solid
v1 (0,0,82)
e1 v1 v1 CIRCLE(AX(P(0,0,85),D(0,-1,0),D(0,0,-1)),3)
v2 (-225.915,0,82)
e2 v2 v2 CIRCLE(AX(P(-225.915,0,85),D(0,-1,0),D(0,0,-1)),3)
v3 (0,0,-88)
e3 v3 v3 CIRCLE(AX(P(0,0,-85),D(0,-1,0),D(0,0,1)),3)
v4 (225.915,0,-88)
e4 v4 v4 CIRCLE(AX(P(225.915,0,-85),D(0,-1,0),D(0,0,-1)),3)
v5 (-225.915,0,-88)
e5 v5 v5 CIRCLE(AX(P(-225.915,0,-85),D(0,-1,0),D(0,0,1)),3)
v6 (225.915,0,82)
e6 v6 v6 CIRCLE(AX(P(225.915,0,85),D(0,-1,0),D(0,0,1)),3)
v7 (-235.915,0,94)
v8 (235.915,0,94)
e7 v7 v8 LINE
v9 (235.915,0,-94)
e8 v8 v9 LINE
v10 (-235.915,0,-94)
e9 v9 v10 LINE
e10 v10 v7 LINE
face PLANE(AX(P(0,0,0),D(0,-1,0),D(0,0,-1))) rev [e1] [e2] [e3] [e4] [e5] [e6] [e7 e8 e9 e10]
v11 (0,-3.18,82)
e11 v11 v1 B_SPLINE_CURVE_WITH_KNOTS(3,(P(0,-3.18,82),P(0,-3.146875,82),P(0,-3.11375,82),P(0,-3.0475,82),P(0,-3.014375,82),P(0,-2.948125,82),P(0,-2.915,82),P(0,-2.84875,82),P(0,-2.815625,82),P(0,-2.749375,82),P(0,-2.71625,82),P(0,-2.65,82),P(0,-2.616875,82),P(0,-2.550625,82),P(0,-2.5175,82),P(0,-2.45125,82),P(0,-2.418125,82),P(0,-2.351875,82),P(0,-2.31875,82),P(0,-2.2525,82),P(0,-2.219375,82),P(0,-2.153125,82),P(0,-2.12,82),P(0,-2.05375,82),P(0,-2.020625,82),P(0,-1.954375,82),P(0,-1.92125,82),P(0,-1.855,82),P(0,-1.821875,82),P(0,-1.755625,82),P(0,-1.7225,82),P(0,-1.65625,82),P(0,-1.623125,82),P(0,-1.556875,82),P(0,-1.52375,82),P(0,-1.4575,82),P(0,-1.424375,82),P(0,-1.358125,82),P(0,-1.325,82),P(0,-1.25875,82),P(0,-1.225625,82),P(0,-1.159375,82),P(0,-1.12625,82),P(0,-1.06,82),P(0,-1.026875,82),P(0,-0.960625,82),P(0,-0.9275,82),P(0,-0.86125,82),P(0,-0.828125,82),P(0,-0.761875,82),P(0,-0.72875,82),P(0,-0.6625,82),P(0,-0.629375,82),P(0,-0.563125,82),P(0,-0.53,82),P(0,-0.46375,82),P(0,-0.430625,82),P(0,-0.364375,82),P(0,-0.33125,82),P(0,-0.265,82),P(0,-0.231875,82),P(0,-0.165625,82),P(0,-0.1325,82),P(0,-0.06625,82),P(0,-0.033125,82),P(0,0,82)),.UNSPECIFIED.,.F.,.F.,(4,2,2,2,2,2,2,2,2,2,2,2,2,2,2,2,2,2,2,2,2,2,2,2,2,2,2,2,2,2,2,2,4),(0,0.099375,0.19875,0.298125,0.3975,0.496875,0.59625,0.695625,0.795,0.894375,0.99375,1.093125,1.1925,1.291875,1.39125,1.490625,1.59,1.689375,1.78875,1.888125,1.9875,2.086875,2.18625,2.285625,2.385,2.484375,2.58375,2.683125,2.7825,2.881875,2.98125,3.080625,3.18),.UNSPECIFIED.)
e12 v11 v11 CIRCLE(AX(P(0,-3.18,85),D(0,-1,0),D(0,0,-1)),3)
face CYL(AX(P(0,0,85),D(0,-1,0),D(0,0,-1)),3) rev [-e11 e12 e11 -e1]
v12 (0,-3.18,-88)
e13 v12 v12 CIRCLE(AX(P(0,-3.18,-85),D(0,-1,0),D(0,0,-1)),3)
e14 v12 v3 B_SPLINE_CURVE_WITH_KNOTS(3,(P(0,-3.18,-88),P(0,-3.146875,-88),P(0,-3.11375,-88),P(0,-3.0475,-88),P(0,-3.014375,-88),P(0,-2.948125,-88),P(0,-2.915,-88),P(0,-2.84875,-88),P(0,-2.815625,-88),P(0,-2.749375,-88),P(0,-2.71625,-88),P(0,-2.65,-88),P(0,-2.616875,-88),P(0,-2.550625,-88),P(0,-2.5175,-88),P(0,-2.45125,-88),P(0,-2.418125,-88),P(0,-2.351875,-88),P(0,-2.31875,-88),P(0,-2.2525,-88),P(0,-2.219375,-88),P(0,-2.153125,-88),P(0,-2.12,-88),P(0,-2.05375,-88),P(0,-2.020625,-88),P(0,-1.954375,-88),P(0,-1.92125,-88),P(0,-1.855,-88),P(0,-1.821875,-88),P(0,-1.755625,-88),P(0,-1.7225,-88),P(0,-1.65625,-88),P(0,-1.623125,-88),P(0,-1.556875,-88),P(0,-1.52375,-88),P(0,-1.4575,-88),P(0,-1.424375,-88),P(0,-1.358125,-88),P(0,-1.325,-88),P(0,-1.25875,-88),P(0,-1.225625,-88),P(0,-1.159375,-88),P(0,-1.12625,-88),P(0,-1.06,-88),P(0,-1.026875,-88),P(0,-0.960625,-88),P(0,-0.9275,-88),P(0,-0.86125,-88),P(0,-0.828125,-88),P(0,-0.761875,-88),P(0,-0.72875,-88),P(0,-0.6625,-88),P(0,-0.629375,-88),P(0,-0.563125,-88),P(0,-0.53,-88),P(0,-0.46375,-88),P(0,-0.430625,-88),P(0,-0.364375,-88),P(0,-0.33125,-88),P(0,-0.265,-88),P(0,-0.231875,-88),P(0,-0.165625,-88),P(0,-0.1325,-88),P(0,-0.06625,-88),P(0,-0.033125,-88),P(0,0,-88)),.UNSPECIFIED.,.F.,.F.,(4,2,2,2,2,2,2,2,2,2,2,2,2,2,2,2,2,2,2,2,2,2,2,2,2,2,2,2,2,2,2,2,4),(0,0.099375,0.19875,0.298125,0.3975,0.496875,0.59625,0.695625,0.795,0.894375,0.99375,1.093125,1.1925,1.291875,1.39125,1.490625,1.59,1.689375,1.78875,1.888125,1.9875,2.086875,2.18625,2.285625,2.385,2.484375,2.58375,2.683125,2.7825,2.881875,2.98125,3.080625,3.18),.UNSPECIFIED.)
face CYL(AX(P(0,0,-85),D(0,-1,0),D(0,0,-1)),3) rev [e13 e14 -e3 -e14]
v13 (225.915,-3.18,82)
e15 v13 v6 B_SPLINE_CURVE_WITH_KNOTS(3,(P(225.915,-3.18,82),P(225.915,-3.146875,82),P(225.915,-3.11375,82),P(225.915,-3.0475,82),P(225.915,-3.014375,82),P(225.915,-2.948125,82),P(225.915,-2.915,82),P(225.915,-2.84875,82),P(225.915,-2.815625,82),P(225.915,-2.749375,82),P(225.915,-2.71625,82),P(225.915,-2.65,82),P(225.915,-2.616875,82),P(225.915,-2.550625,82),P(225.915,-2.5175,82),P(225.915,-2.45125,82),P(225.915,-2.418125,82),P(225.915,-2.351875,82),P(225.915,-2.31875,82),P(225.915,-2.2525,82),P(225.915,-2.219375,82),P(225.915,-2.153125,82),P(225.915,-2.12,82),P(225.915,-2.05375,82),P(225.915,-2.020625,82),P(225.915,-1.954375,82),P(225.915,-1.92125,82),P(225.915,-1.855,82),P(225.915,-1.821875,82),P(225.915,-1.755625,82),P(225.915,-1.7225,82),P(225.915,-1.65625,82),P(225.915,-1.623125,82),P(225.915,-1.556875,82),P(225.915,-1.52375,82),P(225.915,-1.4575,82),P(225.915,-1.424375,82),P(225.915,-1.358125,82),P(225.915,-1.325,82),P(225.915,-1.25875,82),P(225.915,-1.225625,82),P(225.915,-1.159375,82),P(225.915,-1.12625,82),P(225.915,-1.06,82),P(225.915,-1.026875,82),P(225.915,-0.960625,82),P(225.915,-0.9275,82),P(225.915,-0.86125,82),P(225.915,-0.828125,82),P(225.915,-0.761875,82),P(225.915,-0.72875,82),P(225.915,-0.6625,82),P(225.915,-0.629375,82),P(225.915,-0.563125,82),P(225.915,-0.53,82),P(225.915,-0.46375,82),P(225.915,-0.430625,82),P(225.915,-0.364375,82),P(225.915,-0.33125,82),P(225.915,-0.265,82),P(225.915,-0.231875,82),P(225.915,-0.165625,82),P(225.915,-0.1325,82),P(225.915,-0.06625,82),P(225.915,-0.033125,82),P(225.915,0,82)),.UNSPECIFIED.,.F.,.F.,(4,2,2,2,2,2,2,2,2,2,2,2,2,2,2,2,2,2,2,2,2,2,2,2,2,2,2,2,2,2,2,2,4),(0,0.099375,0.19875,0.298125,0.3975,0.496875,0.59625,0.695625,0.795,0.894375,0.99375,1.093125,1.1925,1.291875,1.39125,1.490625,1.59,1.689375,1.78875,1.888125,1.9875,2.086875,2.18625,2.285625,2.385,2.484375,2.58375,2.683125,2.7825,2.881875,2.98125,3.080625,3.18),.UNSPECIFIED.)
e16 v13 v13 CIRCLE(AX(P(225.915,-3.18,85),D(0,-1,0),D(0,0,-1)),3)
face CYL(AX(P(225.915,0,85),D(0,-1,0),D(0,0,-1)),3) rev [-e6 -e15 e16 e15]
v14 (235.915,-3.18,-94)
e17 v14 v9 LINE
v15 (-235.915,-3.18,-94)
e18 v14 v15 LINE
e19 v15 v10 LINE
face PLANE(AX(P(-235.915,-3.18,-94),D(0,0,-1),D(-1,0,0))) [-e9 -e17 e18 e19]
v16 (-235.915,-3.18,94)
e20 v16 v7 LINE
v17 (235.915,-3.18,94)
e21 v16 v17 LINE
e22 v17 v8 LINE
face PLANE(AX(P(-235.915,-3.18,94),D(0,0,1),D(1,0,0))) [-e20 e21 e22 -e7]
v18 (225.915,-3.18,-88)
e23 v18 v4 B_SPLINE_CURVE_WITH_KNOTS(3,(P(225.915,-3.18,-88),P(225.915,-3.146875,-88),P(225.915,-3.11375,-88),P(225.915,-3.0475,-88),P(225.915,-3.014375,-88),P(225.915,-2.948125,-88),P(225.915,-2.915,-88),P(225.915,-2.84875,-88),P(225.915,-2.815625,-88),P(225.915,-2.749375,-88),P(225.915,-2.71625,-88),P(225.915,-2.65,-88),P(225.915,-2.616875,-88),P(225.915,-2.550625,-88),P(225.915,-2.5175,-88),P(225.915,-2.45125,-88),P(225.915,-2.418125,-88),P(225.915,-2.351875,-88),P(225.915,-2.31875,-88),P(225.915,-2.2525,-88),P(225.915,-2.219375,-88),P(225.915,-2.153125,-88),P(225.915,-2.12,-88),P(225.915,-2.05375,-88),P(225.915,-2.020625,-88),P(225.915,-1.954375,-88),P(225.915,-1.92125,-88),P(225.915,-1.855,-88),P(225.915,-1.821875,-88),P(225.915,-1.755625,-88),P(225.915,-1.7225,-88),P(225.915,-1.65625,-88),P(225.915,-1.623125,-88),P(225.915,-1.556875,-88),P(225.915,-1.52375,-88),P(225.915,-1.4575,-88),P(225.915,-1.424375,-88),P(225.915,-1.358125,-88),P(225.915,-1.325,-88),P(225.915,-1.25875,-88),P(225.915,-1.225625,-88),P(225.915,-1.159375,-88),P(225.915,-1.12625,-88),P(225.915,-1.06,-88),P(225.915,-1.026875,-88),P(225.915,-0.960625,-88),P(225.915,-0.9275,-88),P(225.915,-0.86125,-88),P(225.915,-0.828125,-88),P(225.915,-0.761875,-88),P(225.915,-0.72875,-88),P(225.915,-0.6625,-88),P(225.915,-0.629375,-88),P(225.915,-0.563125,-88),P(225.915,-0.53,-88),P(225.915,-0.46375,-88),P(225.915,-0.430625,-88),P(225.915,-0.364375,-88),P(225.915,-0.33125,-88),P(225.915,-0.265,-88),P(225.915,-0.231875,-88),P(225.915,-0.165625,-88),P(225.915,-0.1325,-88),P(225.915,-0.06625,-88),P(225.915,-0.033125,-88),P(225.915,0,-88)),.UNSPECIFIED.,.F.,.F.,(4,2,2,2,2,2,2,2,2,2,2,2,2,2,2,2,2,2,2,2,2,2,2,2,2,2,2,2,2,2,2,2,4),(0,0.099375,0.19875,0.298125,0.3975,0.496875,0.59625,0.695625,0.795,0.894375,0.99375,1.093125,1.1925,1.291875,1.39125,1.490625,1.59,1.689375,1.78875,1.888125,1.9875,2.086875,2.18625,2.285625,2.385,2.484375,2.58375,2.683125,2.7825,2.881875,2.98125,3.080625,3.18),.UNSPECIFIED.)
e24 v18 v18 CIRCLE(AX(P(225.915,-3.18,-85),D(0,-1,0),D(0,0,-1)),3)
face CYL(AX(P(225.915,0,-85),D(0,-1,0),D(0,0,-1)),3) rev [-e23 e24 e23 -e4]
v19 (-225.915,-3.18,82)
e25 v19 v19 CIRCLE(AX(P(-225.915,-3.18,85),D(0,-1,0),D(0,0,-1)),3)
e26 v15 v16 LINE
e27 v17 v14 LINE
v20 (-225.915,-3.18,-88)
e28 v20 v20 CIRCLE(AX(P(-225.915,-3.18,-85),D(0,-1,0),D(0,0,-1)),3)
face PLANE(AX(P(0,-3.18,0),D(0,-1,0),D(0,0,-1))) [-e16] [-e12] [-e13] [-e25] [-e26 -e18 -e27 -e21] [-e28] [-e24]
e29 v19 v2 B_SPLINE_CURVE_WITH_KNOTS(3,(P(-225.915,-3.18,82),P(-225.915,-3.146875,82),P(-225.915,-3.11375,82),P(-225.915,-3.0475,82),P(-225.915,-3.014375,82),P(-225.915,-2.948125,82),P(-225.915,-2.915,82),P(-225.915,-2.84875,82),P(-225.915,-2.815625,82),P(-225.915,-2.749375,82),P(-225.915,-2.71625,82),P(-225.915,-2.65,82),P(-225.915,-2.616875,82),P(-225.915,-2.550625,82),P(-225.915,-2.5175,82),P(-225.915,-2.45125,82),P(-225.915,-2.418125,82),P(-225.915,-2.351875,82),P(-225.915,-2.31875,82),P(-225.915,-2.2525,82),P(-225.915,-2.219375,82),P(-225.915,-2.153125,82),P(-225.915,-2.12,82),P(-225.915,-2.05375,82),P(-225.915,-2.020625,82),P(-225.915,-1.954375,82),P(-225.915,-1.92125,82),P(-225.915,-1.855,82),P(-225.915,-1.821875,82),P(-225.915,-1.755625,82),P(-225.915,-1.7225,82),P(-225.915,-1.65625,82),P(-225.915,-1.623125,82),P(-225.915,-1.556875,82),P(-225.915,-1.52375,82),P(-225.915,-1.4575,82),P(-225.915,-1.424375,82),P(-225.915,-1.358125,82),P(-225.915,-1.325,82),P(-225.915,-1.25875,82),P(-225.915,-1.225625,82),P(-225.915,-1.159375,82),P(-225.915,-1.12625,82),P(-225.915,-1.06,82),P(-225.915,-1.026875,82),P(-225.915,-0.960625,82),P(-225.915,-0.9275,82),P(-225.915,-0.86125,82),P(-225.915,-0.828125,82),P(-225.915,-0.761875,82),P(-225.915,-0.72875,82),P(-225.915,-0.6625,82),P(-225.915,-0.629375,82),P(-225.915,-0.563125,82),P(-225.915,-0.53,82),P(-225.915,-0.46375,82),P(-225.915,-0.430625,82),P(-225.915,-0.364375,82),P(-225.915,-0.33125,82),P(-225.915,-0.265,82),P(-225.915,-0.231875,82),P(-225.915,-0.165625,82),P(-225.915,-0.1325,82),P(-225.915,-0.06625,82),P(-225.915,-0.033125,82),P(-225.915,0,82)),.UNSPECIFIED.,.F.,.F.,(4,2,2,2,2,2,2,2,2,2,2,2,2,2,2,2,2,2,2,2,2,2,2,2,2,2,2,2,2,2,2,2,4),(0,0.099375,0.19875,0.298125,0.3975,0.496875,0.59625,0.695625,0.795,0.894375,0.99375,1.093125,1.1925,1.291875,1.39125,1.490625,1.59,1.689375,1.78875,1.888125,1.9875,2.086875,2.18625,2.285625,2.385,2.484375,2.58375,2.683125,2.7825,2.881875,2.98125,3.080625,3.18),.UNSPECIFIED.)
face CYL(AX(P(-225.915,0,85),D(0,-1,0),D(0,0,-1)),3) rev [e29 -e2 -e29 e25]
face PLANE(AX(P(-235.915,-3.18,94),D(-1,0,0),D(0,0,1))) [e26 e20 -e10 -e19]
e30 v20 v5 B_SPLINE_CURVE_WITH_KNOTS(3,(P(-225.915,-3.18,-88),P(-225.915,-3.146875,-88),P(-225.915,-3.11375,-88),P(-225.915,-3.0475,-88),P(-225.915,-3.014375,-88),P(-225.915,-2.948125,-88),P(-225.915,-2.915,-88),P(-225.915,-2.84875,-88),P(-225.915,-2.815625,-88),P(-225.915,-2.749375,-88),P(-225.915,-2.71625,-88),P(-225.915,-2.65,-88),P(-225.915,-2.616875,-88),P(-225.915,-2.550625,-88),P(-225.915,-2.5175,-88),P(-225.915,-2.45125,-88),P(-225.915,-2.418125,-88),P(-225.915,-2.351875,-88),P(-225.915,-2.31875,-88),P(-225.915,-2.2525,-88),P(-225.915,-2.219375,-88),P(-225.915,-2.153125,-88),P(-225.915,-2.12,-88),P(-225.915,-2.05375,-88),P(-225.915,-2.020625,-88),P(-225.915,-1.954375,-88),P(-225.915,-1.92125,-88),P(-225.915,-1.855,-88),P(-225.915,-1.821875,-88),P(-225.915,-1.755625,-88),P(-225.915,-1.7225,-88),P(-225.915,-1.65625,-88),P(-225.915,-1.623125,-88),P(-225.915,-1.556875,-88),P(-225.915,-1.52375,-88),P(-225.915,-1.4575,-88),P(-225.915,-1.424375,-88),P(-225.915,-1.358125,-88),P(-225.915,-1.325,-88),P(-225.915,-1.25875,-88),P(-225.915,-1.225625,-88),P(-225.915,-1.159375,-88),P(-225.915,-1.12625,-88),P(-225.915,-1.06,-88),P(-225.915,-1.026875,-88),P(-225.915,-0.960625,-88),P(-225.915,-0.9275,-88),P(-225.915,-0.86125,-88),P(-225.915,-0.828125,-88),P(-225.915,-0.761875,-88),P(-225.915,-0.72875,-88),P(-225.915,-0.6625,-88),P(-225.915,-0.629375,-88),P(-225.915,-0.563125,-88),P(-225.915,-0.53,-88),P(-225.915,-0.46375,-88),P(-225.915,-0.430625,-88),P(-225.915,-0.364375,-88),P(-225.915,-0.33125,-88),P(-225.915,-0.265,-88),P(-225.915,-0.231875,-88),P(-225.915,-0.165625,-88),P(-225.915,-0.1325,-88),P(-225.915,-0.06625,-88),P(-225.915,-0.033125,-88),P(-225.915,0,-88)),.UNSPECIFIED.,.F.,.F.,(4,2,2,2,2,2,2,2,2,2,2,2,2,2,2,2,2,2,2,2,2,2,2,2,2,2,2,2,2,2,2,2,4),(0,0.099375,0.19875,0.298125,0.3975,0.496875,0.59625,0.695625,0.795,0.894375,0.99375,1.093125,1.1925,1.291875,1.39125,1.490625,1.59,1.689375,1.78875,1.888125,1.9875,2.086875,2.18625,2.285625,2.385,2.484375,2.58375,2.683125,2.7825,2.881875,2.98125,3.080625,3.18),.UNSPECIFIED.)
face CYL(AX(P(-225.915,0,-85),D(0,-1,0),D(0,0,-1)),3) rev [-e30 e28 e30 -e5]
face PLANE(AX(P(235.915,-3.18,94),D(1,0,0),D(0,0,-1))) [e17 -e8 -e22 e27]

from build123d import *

# Parameters (mm, degrees)
SKETCH1_W               = 471.83
SKETCH1_H               = 188
BASE_FLANGE2_DEPTH      = 3.18
CUT_EXTRUDE1_DEPTH      = 254.972438711
CUT_EXTRUDE1_DEPTH_BACK = 254.972438711
SKETCH2_R               = 3


# Sheet-metal steps are written as plain solids
with BuildPart() as part:
    # Sketch1 → Base-Flange2 (new body)
    with BuildSketch(Plane(origin=(0, 0, 0), x_dir=(1, 0, 0), z_dir=(0, 1, 0))):
        Rectangle(SKETCH1_W, SKETCH1_H)
    extrude(amount=-BASE_FLANGE2_DEPTH)

    # Sketch2 → Cut-Extrude1 (cut, two sides: drawn at the far end of the back side and taken through both)
    with BuildSketch(Plane.XZ.offset(3.18).offset(-CUT_EXTRUDE1_DEPTH_BACK)):
        with Locations(Location((-225.915, 85, 0), (0, 0, 270))):
            Circle(SKETCH2_R)
        with Locations(Location((-225.915, -85, 0), (0, 0, 270))):
            Circle(SKETCH2_R)
        with Locations(Location((225.915, -85, 0), (0, 0, 270))):
            Circle(SKETCH2_R)
        with Locations(Location((225.915, 85, 0), (0, 0, 270))):
            Circle(SKETCH2_R)
        with Locations(Location((0, 85, 0), (0, 0, 270))):
            Circle(SKETCH2_R)
        with Locations(Location((0, -85, 0), (0, 0, 270))):
            Circle(SKETCH2_R)
    extrude(amount=CUT_EXTRUDE1_DEPTH + CUT_EXTRUDE1_DEPTH_BACK, mode=Mode.SUBTRACT)


solid = part.part
